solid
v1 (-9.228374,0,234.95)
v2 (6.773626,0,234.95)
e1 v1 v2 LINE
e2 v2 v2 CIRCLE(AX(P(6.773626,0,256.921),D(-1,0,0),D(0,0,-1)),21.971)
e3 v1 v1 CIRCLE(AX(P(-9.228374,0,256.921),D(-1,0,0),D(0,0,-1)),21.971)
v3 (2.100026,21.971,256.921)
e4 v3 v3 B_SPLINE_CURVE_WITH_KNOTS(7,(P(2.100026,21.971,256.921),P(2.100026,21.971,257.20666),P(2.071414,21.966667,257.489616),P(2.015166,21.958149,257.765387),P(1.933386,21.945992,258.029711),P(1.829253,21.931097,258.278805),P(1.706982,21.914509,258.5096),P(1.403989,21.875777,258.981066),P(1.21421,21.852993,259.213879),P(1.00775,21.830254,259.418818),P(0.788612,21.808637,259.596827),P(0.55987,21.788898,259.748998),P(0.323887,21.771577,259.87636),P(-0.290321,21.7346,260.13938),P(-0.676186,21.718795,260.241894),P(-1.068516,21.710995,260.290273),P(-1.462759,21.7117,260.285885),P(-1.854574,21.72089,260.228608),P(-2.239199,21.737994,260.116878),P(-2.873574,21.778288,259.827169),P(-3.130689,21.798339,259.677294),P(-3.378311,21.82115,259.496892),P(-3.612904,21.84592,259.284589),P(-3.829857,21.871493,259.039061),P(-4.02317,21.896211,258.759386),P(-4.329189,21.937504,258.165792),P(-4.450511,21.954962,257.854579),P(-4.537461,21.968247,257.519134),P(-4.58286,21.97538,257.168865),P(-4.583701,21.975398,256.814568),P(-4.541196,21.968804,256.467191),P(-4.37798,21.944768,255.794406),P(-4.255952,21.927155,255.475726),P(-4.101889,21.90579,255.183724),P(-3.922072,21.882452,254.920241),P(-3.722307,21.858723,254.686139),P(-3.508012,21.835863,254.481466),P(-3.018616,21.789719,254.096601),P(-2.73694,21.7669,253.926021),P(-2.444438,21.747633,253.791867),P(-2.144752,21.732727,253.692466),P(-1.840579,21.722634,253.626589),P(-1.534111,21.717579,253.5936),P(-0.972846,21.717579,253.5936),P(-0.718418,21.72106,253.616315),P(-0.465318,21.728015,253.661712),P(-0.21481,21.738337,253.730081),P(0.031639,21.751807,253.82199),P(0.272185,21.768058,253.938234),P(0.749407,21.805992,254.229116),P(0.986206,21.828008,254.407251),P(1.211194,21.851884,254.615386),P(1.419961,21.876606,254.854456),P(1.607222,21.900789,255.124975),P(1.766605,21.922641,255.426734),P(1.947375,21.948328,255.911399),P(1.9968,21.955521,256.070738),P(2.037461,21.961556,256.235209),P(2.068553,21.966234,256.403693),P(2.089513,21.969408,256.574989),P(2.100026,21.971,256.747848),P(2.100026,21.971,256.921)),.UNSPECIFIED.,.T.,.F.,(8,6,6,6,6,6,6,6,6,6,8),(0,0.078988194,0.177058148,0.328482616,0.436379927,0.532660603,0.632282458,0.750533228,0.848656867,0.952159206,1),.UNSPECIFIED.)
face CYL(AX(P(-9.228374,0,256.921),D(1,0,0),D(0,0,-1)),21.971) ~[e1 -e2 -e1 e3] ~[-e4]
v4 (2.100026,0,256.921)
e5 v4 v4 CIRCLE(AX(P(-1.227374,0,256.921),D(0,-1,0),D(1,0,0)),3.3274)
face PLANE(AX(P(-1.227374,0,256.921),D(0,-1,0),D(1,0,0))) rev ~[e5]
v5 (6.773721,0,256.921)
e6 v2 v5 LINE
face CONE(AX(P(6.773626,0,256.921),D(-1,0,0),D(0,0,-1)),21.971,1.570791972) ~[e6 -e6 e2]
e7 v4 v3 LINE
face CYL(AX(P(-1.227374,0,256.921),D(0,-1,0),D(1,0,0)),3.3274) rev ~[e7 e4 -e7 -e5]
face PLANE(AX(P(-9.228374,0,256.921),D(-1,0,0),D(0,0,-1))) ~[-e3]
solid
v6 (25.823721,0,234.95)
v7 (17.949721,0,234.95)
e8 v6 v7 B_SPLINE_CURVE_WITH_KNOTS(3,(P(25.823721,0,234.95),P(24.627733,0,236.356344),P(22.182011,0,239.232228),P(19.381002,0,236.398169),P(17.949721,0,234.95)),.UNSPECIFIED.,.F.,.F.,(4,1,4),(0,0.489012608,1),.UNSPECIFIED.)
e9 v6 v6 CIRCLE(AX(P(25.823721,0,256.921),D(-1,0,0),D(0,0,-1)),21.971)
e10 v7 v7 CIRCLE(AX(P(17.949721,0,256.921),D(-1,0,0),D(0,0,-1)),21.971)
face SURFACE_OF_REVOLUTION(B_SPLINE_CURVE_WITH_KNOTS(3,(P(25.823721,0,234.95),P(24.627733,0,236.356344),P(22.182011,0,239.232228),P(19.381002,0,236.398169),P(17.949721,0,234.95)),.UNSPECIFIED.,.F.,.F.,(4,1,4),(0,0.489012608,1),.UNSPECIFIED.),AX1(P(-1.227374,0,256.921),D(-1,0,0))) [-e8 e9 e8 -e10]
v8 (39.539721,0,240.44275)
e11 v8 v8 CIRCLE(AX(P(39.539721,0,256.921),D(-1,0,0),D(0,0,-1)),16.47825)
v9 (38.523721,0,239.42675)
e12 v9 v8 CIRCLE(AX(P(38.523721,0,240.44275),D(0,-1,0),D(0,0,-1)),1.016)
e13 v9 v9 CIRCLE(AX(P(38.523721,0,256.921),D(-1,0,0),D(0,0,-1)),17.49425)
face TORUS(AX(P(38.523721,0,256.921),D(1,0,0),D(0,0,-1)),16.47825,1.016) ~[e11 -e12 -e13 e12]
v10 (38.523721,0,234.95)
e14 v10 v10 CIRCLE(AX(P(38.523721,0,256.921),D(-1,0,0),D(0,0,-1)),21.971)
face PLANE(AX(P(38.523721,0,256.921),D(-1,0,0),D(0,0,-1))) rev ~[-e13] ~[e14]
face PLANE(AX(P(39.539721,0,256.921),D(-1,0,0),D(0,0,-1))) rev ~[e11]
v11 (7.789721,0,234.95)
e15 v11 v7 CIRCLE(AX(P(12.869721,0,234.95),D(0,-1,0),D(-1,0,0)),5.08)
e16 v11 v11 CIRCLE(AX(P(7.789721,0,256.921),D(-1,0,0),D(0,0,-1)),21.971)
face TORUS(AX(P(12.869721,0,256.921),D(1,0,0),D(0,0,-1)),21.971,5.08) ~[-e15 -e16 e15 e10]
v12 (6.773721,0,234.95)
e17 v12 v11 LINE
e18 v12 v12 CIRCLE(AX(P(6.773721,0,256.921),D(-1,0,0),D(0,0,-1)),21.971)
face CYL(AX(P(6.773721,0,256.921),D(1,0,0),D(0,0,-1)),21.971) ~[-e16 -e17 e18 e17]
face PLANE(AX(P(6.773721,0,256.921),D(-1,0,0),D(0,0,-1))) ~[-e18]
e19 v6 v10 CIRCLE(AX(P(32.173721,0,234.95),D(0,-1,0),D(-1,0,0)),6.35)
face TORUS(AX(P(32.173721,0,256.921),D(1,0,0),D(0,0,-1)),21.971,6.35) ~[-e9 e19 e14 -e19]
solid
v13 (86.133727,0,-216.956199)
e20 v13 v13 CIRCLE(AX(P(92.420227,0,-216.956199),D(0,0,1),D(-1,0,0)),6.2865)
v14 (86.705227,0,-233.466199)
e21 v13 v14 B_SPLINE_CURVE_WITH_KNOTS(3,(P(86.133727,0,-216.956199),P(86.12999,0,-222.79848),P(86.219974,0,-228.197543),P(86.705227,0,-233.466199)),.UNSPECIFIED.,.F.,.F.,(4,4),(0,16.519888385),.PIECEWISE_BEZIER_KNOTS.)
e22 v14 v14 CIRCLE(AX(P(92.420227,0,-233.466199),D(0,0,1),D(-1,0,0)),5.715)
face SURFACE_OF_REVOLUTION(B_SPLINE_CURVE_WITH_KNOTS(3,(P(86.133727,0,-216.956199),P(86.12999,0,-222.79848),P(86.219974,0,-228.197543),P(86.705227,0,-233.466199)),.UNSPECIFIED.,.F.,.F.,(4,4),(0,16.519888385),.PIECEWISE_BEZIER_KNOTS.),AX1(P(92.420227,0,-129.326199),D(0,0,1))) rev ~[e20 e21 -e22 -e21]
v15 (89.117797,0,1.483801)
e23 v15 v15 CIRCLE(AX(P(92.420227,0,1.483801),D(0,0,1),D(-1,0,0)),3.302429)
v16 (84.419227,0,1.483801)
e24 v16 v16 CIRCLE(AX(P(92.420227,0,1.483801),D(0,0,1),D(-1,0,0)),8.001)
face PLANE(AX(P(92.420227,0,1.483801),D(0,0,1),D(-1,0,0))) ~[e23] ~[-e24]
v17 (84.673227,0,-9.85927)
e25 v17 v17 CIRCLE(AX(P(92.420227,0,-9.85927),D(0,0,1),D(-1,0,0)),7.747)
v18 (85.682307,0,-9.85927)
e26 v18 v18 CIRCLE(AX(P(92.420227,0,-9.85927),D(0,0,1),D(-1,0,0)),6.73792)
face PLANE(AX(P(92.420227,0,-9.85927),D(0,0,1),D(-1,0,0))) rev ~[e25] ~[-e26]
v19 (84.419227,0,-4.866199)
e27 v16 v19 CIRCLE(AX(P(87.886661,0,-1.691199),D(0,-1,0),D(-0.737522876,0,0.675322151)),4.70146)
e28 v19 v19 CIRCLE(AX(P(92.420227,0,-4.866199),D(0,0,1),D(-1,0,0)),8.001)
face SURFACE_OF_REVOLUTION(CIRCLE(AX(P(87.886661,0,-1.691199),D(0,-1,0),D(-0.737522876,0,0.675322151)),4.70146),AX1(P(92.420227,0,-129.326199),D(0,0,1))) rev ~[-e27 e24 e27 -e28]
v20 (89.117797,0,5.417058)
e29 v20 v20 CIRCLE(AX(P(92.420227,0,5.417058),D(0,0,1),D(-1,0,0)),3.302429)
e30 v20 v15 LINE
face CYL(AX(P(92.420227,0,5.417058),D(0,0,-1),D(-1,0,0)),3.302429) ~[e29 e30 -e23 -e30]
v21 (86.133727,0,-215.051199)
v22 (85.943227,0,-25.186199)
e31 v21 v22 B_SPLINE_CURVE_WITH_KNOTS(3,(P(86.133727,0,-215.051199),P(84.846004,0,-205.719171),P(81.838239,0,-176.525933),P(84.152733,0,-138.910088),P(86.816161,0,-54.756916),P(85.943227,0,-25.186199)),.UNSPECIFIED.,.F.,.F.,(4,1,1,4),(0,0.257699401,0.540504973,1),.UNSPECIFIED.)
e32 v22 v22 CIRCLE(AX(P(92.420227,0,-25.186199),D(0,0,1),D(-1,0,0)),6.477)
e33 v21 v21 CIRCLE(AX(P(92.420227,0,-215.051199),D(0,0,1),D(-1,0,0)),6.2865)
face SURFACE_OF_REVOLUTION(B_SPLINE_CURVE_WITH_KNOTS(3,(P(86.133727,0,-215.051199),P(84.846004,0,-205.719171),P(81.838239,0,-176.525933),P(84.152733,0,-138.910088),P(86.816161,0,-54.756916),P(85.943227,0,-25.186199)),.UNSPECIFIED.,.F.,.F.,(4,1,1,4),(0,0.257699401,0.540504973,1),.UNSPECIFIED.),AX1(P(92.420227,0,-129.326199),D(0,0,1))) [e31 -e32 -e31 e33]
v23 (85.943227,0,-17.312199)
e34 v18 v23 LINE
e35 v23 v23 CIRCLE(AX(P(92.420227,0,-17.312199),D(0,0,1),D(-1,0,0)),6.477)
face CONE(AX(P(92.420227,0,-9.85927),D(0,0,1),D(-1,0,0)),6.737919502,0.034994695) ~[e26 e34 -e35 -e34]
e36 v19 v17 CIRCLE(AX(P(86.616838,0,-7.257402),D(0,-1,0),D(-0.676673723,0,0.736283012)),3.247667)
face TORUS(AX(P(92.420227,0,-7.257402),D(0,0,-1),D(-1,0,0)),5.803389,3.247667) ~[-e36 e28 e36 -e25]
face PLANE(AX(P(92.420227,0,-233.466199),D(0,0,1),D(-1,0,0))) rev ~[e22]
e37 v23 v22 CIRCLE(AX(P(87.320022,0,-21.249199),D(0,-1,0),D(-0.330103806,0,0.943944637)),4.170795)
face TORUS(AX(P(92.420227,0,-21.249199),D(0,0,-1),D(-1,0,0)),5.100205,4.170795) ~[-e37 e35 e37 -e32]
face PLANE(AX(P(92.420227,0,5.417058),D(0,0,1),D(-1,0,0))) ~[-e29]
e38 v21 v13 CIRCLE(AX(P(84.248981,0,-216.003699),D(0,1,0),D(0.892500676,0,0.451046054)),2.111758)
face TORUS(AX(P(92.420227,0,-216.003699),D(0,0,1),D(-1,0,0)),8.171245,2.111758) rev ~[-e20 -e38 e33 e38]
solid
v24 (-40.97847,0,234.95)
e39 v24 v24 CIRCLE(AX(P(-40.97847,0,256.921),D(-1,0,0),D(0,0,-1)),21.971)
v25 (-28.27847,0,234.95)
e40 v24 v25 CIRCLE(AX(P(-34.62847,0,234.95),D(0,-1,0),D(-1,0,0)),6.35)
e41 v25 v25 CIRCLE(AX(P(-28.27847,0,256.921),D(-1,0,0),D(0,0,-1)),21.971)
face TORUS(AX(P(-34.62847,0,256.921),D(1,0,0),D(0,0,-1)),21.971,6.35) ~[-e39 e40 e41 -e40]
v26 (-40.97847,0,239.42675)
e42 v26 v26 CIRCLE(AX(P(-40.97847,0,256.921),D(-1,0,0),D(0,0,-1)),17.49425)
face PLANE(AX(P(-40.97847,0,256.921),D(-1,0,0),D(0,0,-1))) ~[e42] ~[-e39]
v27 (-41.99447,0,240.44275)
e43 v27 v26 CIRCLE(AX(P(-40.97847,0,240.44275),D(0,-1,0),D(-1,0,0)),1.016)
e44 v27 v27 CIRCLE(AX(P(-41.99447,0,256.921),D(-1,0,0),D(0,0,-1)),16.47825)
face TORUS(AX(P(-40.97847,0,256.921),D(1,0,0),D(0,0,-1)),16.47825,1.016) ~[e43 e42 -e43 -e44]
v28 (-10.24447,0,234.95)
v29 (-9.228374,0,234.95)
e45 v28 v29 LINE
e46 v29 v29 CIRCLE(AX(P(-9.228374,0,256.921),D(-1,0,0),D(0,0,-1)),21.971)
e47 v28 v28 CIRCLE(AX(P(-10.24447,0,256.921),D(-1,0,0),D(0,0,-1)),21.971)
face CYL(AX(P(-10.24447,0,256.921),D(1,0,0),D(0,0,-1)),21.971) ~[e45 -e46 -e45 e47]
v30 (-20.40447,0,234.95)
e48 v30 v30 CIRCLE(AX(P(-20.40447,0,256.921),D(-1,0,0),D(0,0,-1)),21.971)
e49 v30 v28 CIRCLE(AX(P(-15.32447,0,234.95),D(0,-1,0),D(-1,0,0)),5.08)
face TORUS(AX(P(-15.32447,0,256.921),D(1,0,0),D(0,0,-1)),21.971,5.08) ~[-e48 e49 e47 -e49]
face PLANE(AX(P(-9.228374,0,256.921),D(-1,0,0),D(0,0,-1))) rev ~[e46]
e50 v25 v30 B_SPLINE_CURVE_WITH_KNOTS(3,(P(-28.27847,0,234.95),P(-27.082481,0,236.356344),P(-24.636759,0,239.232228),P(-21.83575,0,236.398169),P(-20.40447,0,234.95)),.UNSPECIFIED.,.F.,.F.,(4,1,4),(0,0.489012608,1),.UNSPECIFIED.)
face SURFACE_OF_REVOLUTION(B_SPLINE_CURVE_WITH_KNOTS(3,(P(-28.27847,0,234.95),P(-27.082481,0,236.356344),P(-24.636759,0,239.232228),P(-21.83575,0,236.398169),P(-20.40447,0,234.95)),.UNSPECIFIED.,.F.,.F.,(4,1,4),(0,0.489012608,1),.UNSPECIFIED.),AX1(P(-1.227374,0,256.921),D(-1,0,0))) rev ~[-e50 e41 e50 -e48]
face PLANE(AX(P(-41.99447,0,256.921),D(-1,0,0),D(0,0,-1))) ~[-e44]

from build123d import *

# Parameters (mm, degrees)
F5_D     = 6.6548
F5_DEPTH = 21.972


# Not quite as in the source:
# - ends of sketch curves that miss each other by under 0.0002 mm in the source are joined


with BuildPart() as f1:
    # F0 (on Front) → F1 (revolve)
    with BuildSketch(Plane.XZ):
        with BuildLine():
            Line((-10.2444698859, 234.95), (-9.2283742104, 234.95))
            Line((-9.2283742104, 234.95), (-9.2283742104, 256.921))
            Line((-9.2283742104, 256.921), (-41.9944698859, 256.921))
            Line((-41.9944698859, 256.921), (-41.9944698859, 240.44275))
            ThreePointArc((-41.9944698859, 240.44275), (-41.6968903756, 239.7243295103), (-40.9784698859, 239.42675))
            Line((-40.9784698859, 239.42675), (-40.9784698859, 234.95))
            ThreePointArc((-40.9784698859, 234.95), (-34.6284698859, 228.6), (-28.2784698859, 234.95))
            add(Edge.make_bspline(
                [(-28.2784698859, 234.95), (-27.0824810676, 236.3563437226), (-24.6367592232, 239.2322281043), (-21.8357501873, 236.398168649), (-20.4044698859, 234.95)],
                knots=[0, 0, 0, 0, 0.4890126083, 1, 1, 1, 1], degree=3))
            ThreePointArc((-20.4044698859, 234.95), (-15.3244698859, 229.87), (-10.2444698859, 234.95))
        make_face()
    revolve(axis=Axis((-1.2273742104, 0, 256.921), (-1, 0, 0)))

    # F0 (on Front) → F2 (revolve)
    with BuildSketch(Plane.XZ):
        with BuildLine():
            Line((-10.2444698859, 234.95), (-9.2283742104, 234.95))
            Line((-9.2283742104, 234.95), (-9.2283742104, 256.921))
            Line((-9.2283742104, 256.921), (-41.9944698859, 256.921))
            Line((-41.9944698859, 256.921), (-41.9944698859, 240.44275))
            ThreePointArc((-41.9944698859, 240.44275), (-41.6968903756, 239.7243295103), (-40.9784698859, 239.42675))
            Line((-40.9784698859, 239.42675), (-40.9784698859, 234.95))
            ThreePointArc((-40.9784698859, 234.95), (-34.6284698859, 228.6), (-28.2784698859, 234.95))
            add(Edge.make_bspline(
                [(-28.2784698859, 234.95), (-27.0824810676, 236.3563437226), (-24.6367592232, 239.2322281043), (-21.8357501873, 236.398168649), (-20.4044698859, 234.95)],
                knots=[0, 0, 0, 0, 0.4890126083, 1, 1, 1, 1], degree=3))
            ThreePointArc((-20.4044698859, 234.95), (-15.3244698859, 229.87), (-10.2444698859, 234.95))
        make_face()
    revolve(axis=Axis((-1.2273742104, 0, 256.921), (-1, 0, 0)))


with BuildPart() as f1b:
    # F0 (on Front) → F1, piece 2 (revolve)
    with BuildSketch(Plane.XZ):
        with BuildLine():
            Line((6.7737214651, 256.921), (6.7737214651, 234.95))
            Line((6.7737214651, 234.95), (7.7897214651, 234.95))
            ThreePointArc((7.7897214651, 234.95), (12.8697214651, 229.87), (17.9497214651, 234.95))
            add(Edge.make_bspline(
                [(25.8237214651, 234.95), (24.6277326467, 236.3563437226), (22.1820108023, 239.2322281043), (19.3810017664, 236.398168649), (17.9497214651, 234.95)],
                knots=[0, 0, 0, 0, 0.4890126083, 1, 1, 1, 1], degree=3))
            ThreePointArc((25.8237214651, 234.95), (32.1737214651, 228.6), (38.5237214651, 234.95))
            Line((38.5237214651, 234.95), (38.5237214651, 239.42675))
            ThreePointArc((38.5237214651, 239.42675), (39.2421419547, 239.7243295103), (39.5397214651, 240.44275))
            Line((39.5397214651, 240.44275), (39.5397214651, 256.921))
            Line((39.5397214651, 256.921), (6.7737214651, 256.921))
        make_face()
    revolve(axis=Axis((-1.2273742104, 0, 256.921), (-1, 0, 0)))

    # F0 (on Front) → F2, piece 2 (revolve)
    with BuildSketch(Plane.XZ):
        with BuildLine():
            Line((6.7737214651, 256.921), (6.7737214651, 234.95))
            Line((6.7737214651, 234.95), (7.7897214651, 234.95))
            ThreePointArc((7.7897214651, 234.95), (12.8697214651, 229.87), (17.9497214651, 234.95))
            add(Edge.make_bspline(
                [(25.8237214651, 234.95), (24.6277326467, 236.3563437226), (22.1820108023, 239.2322281043), (19.3810017664, 236.398168649), (17.9497214651, 234.95)],
                knots=[0, 0, 0, 0, 0.4890126083, 1, 1, 1, 1], degree=3))
            ThreePointArc((25.8237214651, 234.95), (32.1737214651, 228.6), (38.5237214651, 234.95))
            Line((38.5237214651, 234.95), (38.5237214651, 239.42675))
            ThreePointArc((38.5237214651, 239.42675), (39.2421419547, 239.7243295103), (39.5397214651, 240.44275))
            Line((39.5397214651, 240.44275), (39.5397214651, 256.921))
            Line((39.5397214651, 256.921), (6.7737214651, 256.921))
        make_face()
    revolve(axis=Axis((-1.2273742104, 0, 256.921), (-1, 0, 0)))


with BuildPart() as f3:
    # F0 (on Front) → F3 (revolve)
    with BuildSketch(Plane.XZ):
        Polygon((-9.2283742104, 234.95), (-4.5298035257, 234.95), (-1.2273742104, 234.95), (6.7736257896, 234.95), (6.7737214651, 256.921), (-9.2283742104, 256.921), align=None)
    revolve(axis=Axis((-1.2273742104, 0, 256.921), (-1, 0, 0)))

    # F5 (through all, one way)
    with BuildSketch(Plane.XZ):
        with Locations((-1.2273742104, 256.921)):
            Circle(F5_D / 2)
    extrude(amount=-F5_DEPTH, mode=Mode.SUBTRACT)


with BuildPart() as f4:
    # F0 (on Front) → F4 (revolve)
    with BuildSketch(Plane.XZ):
        with BuildLine():
            ThreePointArc((86.1337266892, -215.0511991246), (86.3607392191, -216.0036991246), (86.1337266892, -216.9561991246))
            add(Edge.make_bspline(
                [(86.1337266892, -216.9561991246), (86.1299897573, -222.7984801777), (86.2199741445, -228.1975429416), (86.7052266892, -233.4661991246)],
                knots=[0, 0, 0, 0, 16.5198883849, 16.5198883849, 16.5198883849, 16.5198883849], degree=3))
            Line((86.7052266892, -233.4661991246), (92.4202266892, -233.4661991246))
            Line((92.4202266892, -233.4661991246), (92.4202266892, -25.1861991246))
            Line((92.4202266892, -25.1861991246), (92.4202266892, -17.3121991246))
            Line((92.4202266892, -17.3121991246), (92.4202266892, 1.4838008754))
            Line((92.4202266892, 1.4838008754), (92.4202266892, 5.4170577876))
            Line((92.4202266892, 5.4170577876), (89.1177973739, 5.4170577876))
            Line((89.1177973739, 5.4170577876), (89.1177973739, 1.4838008754))
            Line((89.1177973739, 1.4838008754), (84.4192266892, 1.4838008754))
            ThreePointArc((84.4192266892, 1.4838008754), (83.1852010196, -1.6911991246), (84.4192266892, -4.8661991246))
            ThreePointArc((84.4192266892, -4.8661991246), (83.3733644878, -7.4223986176), (84.6732266892, -9.8592699416))
            Line((84.6732266892, -9.8592699416), (85.6823071867, -9.8592699416))
            Line((85.6823071867, -9.8592699416), (85.9432266892, -17.3121991246))
            ThreePointArc((85.9432266892, -17.3121991246), (83.1492266892, -21.2491991246), (85.9432266892, -25.1861991246))
            add(Edge.make_bspline(
                [(86.1337266892, -215.0511991246), (84.8460040719, -205.7191707982), (81.8382387738, -176.5259328045), (84.1527333359, -138.910088313), (86.8161607127, -54.7569156535), (85.9432266892, -25.1861991246)],
                knots=[0, 0, 0, 0, 0.2576994007, 0.5405049731, 1, 1, 1, 1], degree=3))
        make_face()
    revolve(axis=Axis((92.4202266892, 0, -129.3261991246), (0, 0, 1)))


solid = Compound([f1.part, f1b.part, f3.part, f4.part])
